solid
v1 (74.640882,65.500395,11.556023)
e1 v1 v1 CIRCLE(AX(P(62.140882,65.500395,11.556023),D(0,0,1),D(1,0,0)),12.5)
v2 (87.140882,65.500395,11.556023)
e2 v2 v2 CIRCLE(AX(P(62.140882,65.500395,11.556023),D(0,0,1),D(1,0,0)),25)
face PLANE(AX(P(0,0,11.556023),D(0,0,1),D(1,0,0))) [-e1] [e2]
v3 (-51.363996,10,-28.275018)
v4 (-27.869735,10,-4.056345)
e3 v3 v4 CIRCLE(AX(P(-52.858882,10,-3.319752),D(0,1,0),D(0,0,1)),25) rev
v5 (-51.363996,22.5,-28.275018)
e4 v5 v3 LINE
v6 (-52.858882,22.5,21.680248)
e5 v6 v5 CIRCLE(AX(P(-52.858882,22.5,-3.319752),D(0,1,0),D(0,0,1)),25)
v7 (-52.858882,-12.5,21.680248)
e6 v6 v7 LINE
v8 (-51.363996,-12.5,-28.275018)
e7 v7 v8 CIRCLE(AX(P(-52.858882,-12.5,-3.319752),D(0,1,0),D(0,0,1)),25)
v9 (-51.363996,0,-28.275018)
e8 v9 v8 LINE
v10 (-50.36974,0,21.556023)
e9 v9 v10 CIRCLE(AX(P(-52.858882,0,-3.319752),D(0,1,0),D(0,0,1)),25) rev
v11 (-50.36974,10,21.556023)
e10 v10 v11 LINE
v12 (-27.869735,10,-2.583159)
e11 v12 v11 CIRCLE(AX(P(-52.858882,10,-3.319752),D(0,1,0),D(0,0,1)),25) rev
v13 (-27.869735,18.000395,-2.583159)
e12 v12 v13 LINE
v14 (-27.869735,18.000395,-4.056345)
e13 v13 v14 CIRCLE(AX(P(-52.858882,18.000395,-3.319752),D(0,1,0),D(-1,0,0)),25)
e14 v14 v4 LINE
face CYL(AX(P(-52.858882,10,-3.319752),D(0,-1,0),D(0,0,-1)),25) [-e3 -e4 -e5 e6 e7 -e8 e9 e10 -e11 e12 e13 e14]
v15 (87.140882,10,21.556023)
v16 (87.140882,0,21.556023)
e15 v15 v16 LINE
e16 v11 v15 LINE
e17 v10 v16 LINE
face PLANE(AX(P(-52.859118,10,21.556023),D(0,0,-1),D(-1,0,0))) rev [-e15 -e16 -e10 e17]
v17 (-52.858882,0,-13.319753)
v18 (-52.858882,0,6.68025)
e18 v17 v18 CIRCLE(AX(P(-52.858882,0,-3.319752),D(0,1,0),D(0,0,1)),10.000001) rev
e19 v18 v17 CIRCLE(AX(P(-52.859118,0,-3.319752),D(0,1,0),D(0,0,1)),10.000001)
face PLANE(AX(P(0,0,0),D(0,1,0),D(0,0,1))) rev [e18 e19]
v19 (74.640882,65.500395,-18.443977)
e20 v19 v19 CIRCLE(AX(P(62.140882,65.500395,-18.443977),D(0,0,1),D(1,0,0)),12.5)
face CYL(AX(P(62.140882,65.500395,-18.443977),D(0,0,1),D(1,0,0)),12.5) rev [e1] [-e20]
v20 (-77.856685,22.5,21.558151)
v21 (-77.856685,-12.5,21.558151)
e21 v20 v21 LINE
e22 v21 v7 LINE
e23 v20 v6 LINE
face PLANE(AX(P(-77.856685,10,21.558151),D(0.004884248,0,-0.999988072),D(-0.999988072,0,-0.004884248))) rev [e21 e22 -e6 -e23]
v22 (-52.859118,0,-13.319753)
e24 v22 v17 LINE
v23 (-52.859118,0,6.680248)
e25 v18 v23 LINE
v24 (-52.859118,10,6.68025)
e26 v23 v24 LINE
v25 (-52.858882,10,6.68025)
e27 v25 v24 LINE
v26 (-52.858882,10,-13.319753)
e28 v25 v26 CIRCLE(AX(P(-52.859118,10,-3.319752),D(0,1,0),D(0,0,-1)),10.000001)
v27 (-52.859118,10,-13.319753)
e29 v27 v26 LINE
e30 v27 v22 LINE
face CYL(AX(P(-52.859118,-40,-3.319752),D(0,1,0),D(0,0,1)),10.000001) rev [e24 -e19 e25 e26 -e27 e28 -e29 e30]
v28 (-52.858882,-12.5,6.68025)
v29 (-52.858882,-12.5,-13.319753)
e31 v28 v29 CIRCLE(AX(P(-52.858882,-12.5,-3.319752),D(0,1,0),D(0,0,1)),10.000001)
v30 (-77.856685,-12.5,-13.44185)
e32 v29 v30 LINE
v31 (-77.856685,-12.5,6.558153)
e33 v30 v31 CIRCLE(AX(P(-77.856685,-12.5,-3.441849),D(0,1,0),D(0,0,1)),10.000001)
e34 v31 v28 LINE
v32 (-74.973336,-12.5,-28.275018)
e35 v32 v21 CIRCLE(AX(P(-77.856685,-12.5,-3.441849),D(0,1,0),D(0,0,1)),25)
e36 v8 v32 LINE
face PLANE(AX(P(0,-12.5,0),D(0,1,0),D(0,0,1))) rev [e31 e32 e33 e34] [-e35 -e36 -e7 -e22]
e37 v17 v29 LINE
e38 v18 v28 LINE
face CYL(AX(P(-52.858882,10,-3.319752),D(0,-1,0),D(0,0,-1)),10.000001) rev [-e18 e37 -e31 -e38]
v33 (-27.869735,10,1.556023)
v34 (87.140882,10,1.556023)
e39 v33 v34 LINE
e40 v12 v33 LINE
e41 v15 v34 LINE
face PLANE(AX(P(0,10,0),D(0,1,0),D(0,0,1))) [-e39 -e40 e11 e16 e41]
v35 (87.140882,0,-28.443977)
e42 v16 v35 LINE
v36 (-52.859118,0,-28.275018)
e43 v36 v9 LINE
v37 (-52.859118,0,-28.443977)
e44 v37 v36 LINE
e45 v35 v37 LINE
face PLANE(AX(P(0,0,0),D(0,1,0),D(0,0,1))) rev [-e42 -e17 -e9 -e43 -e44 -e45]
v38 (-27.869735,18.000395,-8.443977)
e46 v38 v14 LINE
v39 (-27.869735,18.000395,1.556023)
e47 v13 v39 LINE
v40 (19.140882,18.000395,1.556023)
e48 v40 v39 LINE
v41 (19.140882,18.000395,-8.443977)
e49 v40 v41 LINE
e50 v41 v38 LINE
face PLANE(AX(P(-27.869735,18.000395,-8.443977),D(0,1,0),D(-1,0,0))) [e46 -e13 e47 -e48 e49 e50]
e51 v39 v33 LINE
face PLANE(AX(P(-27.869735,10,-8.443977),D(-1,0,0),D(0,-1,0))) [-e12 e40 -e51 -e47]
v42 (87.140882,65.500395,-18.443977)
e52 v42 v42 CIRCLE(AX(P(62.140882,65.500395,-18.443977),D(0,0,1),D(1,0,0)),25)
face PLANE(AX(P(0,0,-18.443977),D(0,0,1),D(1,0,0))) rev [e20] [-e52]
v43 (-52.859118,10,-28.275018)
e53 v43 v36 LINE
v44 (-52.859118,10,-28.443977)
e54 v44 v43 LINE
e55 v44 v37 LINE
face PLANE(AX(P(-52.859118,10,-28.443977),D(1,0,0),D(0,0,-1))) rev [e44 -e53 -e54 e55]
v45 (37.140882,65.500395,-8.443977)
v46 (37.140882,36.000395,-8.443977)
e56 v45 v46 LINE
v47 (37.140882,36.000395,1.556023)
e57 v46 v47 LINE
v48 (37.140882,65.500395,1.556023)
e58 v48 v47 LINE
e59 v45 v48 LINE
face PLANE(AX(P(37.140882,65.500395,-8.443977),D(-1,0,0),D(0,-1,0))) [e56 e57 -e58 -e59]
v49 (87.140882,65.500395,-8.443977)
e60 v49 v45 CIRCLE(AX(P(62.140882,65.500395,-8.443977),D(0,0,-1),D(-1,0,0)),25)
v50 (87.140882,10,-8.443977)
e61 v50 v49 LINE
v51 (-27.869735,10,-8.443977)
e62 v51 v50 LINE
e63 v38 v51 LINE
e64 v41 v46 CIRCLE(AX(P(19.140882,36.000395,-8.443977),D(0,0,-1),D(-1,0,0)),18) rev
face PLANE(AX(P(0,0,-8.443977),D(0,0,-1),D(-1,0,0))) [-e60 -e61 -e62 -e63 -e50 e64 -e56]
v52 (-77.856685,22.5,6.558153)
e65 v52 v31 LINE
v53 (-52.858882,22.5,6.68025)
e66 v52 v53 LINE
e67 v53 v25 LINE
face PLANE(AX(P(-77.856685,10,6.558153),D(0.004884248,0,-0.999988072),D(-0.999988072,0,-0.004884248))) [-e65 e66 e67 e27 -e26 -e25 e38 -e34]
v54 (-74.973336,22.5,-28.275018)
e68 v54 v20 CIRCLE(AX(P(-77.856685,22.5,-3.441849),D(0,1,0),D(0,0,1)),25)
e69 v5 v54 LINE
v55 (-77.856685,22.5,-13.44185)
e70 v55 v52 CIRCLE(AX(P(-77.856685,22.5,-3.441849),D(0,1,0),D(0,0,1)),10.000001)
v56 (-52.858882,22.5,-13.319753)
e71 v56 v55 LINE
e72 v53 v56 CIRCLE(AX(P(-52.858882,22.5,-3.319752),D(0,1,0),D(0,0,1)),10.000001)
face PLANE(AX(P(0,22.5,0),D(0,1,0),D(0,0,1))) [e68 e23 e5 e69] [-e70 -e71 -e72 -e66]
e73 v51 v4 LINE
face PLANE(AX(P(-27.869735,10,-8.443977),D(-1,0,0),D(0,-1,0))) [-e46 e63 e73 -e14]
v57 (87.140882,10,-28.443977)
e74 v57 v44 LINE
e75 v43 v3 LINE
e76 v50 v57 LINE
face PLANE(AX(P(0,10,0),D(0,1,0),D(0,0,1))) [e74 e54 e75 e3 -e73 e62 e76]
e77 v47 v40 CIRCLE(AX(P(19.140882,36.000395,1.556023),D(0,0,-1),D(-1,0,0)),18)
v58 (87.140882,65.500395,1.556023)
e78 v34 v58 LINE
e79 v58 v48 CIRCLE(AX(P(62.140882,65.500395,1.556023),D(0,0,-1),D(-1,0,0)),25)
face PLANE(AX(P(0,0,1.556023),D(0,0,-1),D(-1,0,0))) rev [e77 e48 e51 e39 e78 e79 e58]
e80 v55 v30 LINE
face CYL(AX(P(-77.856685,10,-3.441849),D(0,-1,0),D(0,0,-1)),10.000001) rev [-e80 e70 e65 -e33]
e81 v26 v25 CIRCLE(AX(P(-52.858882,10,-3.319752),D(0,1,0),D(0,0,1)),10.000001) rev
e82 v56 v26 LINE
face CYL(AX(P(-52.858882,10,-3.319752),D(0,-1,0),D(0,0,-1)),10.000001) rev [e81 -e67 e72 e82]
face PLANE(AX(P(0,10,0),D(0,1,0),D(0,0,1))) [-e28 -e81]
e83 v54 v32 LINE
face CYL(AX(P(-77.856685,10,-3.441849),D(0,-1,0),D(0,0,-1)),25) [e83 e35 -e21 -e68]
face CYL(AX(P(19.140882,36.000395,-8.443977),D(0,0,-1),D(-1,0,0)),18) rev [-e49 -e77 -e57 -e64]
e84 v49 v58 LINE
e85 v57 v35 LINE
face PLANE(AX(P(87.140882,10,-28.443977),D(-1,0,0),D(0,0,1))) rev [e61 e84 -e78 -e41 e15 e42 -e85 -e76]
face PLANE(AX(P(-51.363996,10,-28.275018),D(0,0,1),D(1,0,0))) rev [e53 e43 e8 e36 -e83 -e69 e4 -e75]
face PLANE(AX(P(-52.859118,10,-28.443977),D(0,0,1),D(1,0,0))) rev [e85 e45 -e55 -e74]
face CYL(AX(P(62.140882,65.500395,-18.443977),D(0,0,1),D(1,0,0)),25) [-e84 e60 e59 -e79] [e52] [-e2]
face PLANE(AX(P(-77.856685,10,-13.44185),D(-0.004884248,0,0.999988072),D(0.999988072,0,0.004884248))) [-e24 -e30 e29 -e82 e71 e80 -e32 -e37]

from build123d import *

# Parameters (mm, degrees)
SKETCH1_W                 = 140
SKETCH1_H                 = 50
BOSS_EXTRUDE1_DEPTH       = 10
BOSS_EXTRUDE2_START       = -12.5
BOSS_EXTRUDE2_DEPTH       = 35
CUT_EXTRUDE1_DEPTH        = 50
BOSS_EXTRUDE8_DEPTH       = 5
BOSS_EXTRUDE9_START       = -18.443977
BOSS_EXTRUDE9_OUTLINE_R   = 25
BOSS_EXTRUDE9_OUTLINE_R_2 = 12.5
BOSS_EXTRUDE9_DEPTH       = 30
FILLET1_R                 = 18
CUT_EXTRUDE2_START        = -30
CUT_EXTRUDE2_DEPTH        = 30


# Read off the part's stored shape, not the designer's step: Boss-Extrude2, Boss-Extrude9
with BuildPart() as part:
    # Sketch1 → Boss-Extrude1 (new body)
    with BuildSketch(Plane(origin=(0, 0, 0), x_dir=(1, 0, 0), z_dir=(0, 1, 0))):
        with Locations((17.140882, 3.443977)):
            Rectangle(SKETCH1_W, SKETCH1_H)
    extrude(amount=BOSS_EXTRUDE1_DEPTH)

    # Boss-Extrude2 outline → Boss-Extrude2 (add)
    with BuildSketch(Plane(origin=(0, 0, 0), x_dir=(1, 0, 0), z_dir=(0, 1, 0)).offset(BOSS_EXTRUDE2_START)):
        with BuildLine():
            Line((-51.363996, 28.275018), (-52.859118, 28.275018))
            Line((-52.859118, 28.275018), (-74.973336, 28.275018))
            ThreePointArc((-74.973336, 28.275018), (-102.814942, 4.885934), (-77.856685, -21.558151))
            Line((-77.856685, -21.558151), (-52.858882, -21.680248))
            ThreePointArc((-52.858882, -21.680248), (-27.870068, 2.571974), (-51.363996, 28.275018))
        make_face()
        with BuildLine():
            Line((-52.859118, 13.319754), (-52.858882, 13.319753))
            ThreePointArc((-52.858882, 13.319753), (-42.85888, 3.319752), (-52.858882, -6.68025))
            Line((-52.858882, -6.68025), (-52.859118, -6.680248))
            Line((-52.859118, -6.680248), (-77.856685, -6.558153))
            ThreePointArc((-77.856685, -6.558153), (-87.856686, 3.441849), (-77.856685, 13.44185))
            Line((-77.856685, 13.44185), (-52.859118, 13.319754))
        make_face(mode=Mode.SUBTRACT)
    extrude(amount=BOSS_EXTRUDE2_DEPTH)

    # Sketch2 → Cut-Extrude1 (cut)
    with BuildSketch(Plane(origin=(0, 10, 0), x_dir=(1, 0, 0), z_dir=(0, 1, 0))):
        with BuildLine():
            Line((-52.859118, 13.319753), (-52.859118, -6.68025))
            ThreePointArc((-52.859118, -6.68025), (-42.859116, 3.319752), (-52.859118, 13.319753))
        make_face()
    extrude(amount=-CUT_EXTRUDE1_DEPTH, mode=Mode.SUBTRACT)

    # 3DSketch2 → Boss-Extrude8 (add, symmetric)
    with BuildSketch(Plane(origin=(87.140882, 10, -3.443977), x_dir=(-0.9975892937431798, 0.0693945315495666, 0), z_dir=(0, 0, -1))):
        Polygon((0, 0), (114.733361, -7.981108), (115.288545, 0), (50.434648, 4.511381), (53.730889, 51.896873), (3.851424, 55.366599), align=None)
    extrude(amount=BOSS_EXTRUDE8_DEPTH, both=True)

    # Boss-Extrude9 outline → Boss-Extrude9 (add)
    with BuildSketch(Plane.XY.offset(BOSS_EXTRUDE9_START)):
        with Locations((62.140882, 65.500395)):
            Circle(BOSS_EXTRUDE9_OUTLINE_R)
        with Locations((62.140882, 65.500395)):
            Circle(BOSS_EXTRUDE9_OUTLINE_R_2, mode=Mode.SUBTRACT)
    extrude(amount=BOSS_EXTRUDE9_DEPTH)

    # Fillet1
    fillet1_edges = [part.edges().sort_by_distance(p)[0] for p in [
        (37.140882, 18.000395, -3.443977),
    ]]
    fillet(fillet1_edges, radius=FILLET1_R)

    # Sketch3 → Cut-Extrude2 (cut)
    with BuildSketch(Plane.XY.offset(1.556023).offset(CUT_EXTRUDE2_START)):
        with BuildLine():
            Line((74.640882, 65.500395), (49.640882, 65.500395))
            ThreePointArc((49.640882, 65.500395), (62.140882, 53.000395), (74.640882, 65.500395))
        make_face()
    extrude(amount=CUT_EXTRUDE2_DEPTH, mode=Mode.SUBTRACT)


solid = part.part
